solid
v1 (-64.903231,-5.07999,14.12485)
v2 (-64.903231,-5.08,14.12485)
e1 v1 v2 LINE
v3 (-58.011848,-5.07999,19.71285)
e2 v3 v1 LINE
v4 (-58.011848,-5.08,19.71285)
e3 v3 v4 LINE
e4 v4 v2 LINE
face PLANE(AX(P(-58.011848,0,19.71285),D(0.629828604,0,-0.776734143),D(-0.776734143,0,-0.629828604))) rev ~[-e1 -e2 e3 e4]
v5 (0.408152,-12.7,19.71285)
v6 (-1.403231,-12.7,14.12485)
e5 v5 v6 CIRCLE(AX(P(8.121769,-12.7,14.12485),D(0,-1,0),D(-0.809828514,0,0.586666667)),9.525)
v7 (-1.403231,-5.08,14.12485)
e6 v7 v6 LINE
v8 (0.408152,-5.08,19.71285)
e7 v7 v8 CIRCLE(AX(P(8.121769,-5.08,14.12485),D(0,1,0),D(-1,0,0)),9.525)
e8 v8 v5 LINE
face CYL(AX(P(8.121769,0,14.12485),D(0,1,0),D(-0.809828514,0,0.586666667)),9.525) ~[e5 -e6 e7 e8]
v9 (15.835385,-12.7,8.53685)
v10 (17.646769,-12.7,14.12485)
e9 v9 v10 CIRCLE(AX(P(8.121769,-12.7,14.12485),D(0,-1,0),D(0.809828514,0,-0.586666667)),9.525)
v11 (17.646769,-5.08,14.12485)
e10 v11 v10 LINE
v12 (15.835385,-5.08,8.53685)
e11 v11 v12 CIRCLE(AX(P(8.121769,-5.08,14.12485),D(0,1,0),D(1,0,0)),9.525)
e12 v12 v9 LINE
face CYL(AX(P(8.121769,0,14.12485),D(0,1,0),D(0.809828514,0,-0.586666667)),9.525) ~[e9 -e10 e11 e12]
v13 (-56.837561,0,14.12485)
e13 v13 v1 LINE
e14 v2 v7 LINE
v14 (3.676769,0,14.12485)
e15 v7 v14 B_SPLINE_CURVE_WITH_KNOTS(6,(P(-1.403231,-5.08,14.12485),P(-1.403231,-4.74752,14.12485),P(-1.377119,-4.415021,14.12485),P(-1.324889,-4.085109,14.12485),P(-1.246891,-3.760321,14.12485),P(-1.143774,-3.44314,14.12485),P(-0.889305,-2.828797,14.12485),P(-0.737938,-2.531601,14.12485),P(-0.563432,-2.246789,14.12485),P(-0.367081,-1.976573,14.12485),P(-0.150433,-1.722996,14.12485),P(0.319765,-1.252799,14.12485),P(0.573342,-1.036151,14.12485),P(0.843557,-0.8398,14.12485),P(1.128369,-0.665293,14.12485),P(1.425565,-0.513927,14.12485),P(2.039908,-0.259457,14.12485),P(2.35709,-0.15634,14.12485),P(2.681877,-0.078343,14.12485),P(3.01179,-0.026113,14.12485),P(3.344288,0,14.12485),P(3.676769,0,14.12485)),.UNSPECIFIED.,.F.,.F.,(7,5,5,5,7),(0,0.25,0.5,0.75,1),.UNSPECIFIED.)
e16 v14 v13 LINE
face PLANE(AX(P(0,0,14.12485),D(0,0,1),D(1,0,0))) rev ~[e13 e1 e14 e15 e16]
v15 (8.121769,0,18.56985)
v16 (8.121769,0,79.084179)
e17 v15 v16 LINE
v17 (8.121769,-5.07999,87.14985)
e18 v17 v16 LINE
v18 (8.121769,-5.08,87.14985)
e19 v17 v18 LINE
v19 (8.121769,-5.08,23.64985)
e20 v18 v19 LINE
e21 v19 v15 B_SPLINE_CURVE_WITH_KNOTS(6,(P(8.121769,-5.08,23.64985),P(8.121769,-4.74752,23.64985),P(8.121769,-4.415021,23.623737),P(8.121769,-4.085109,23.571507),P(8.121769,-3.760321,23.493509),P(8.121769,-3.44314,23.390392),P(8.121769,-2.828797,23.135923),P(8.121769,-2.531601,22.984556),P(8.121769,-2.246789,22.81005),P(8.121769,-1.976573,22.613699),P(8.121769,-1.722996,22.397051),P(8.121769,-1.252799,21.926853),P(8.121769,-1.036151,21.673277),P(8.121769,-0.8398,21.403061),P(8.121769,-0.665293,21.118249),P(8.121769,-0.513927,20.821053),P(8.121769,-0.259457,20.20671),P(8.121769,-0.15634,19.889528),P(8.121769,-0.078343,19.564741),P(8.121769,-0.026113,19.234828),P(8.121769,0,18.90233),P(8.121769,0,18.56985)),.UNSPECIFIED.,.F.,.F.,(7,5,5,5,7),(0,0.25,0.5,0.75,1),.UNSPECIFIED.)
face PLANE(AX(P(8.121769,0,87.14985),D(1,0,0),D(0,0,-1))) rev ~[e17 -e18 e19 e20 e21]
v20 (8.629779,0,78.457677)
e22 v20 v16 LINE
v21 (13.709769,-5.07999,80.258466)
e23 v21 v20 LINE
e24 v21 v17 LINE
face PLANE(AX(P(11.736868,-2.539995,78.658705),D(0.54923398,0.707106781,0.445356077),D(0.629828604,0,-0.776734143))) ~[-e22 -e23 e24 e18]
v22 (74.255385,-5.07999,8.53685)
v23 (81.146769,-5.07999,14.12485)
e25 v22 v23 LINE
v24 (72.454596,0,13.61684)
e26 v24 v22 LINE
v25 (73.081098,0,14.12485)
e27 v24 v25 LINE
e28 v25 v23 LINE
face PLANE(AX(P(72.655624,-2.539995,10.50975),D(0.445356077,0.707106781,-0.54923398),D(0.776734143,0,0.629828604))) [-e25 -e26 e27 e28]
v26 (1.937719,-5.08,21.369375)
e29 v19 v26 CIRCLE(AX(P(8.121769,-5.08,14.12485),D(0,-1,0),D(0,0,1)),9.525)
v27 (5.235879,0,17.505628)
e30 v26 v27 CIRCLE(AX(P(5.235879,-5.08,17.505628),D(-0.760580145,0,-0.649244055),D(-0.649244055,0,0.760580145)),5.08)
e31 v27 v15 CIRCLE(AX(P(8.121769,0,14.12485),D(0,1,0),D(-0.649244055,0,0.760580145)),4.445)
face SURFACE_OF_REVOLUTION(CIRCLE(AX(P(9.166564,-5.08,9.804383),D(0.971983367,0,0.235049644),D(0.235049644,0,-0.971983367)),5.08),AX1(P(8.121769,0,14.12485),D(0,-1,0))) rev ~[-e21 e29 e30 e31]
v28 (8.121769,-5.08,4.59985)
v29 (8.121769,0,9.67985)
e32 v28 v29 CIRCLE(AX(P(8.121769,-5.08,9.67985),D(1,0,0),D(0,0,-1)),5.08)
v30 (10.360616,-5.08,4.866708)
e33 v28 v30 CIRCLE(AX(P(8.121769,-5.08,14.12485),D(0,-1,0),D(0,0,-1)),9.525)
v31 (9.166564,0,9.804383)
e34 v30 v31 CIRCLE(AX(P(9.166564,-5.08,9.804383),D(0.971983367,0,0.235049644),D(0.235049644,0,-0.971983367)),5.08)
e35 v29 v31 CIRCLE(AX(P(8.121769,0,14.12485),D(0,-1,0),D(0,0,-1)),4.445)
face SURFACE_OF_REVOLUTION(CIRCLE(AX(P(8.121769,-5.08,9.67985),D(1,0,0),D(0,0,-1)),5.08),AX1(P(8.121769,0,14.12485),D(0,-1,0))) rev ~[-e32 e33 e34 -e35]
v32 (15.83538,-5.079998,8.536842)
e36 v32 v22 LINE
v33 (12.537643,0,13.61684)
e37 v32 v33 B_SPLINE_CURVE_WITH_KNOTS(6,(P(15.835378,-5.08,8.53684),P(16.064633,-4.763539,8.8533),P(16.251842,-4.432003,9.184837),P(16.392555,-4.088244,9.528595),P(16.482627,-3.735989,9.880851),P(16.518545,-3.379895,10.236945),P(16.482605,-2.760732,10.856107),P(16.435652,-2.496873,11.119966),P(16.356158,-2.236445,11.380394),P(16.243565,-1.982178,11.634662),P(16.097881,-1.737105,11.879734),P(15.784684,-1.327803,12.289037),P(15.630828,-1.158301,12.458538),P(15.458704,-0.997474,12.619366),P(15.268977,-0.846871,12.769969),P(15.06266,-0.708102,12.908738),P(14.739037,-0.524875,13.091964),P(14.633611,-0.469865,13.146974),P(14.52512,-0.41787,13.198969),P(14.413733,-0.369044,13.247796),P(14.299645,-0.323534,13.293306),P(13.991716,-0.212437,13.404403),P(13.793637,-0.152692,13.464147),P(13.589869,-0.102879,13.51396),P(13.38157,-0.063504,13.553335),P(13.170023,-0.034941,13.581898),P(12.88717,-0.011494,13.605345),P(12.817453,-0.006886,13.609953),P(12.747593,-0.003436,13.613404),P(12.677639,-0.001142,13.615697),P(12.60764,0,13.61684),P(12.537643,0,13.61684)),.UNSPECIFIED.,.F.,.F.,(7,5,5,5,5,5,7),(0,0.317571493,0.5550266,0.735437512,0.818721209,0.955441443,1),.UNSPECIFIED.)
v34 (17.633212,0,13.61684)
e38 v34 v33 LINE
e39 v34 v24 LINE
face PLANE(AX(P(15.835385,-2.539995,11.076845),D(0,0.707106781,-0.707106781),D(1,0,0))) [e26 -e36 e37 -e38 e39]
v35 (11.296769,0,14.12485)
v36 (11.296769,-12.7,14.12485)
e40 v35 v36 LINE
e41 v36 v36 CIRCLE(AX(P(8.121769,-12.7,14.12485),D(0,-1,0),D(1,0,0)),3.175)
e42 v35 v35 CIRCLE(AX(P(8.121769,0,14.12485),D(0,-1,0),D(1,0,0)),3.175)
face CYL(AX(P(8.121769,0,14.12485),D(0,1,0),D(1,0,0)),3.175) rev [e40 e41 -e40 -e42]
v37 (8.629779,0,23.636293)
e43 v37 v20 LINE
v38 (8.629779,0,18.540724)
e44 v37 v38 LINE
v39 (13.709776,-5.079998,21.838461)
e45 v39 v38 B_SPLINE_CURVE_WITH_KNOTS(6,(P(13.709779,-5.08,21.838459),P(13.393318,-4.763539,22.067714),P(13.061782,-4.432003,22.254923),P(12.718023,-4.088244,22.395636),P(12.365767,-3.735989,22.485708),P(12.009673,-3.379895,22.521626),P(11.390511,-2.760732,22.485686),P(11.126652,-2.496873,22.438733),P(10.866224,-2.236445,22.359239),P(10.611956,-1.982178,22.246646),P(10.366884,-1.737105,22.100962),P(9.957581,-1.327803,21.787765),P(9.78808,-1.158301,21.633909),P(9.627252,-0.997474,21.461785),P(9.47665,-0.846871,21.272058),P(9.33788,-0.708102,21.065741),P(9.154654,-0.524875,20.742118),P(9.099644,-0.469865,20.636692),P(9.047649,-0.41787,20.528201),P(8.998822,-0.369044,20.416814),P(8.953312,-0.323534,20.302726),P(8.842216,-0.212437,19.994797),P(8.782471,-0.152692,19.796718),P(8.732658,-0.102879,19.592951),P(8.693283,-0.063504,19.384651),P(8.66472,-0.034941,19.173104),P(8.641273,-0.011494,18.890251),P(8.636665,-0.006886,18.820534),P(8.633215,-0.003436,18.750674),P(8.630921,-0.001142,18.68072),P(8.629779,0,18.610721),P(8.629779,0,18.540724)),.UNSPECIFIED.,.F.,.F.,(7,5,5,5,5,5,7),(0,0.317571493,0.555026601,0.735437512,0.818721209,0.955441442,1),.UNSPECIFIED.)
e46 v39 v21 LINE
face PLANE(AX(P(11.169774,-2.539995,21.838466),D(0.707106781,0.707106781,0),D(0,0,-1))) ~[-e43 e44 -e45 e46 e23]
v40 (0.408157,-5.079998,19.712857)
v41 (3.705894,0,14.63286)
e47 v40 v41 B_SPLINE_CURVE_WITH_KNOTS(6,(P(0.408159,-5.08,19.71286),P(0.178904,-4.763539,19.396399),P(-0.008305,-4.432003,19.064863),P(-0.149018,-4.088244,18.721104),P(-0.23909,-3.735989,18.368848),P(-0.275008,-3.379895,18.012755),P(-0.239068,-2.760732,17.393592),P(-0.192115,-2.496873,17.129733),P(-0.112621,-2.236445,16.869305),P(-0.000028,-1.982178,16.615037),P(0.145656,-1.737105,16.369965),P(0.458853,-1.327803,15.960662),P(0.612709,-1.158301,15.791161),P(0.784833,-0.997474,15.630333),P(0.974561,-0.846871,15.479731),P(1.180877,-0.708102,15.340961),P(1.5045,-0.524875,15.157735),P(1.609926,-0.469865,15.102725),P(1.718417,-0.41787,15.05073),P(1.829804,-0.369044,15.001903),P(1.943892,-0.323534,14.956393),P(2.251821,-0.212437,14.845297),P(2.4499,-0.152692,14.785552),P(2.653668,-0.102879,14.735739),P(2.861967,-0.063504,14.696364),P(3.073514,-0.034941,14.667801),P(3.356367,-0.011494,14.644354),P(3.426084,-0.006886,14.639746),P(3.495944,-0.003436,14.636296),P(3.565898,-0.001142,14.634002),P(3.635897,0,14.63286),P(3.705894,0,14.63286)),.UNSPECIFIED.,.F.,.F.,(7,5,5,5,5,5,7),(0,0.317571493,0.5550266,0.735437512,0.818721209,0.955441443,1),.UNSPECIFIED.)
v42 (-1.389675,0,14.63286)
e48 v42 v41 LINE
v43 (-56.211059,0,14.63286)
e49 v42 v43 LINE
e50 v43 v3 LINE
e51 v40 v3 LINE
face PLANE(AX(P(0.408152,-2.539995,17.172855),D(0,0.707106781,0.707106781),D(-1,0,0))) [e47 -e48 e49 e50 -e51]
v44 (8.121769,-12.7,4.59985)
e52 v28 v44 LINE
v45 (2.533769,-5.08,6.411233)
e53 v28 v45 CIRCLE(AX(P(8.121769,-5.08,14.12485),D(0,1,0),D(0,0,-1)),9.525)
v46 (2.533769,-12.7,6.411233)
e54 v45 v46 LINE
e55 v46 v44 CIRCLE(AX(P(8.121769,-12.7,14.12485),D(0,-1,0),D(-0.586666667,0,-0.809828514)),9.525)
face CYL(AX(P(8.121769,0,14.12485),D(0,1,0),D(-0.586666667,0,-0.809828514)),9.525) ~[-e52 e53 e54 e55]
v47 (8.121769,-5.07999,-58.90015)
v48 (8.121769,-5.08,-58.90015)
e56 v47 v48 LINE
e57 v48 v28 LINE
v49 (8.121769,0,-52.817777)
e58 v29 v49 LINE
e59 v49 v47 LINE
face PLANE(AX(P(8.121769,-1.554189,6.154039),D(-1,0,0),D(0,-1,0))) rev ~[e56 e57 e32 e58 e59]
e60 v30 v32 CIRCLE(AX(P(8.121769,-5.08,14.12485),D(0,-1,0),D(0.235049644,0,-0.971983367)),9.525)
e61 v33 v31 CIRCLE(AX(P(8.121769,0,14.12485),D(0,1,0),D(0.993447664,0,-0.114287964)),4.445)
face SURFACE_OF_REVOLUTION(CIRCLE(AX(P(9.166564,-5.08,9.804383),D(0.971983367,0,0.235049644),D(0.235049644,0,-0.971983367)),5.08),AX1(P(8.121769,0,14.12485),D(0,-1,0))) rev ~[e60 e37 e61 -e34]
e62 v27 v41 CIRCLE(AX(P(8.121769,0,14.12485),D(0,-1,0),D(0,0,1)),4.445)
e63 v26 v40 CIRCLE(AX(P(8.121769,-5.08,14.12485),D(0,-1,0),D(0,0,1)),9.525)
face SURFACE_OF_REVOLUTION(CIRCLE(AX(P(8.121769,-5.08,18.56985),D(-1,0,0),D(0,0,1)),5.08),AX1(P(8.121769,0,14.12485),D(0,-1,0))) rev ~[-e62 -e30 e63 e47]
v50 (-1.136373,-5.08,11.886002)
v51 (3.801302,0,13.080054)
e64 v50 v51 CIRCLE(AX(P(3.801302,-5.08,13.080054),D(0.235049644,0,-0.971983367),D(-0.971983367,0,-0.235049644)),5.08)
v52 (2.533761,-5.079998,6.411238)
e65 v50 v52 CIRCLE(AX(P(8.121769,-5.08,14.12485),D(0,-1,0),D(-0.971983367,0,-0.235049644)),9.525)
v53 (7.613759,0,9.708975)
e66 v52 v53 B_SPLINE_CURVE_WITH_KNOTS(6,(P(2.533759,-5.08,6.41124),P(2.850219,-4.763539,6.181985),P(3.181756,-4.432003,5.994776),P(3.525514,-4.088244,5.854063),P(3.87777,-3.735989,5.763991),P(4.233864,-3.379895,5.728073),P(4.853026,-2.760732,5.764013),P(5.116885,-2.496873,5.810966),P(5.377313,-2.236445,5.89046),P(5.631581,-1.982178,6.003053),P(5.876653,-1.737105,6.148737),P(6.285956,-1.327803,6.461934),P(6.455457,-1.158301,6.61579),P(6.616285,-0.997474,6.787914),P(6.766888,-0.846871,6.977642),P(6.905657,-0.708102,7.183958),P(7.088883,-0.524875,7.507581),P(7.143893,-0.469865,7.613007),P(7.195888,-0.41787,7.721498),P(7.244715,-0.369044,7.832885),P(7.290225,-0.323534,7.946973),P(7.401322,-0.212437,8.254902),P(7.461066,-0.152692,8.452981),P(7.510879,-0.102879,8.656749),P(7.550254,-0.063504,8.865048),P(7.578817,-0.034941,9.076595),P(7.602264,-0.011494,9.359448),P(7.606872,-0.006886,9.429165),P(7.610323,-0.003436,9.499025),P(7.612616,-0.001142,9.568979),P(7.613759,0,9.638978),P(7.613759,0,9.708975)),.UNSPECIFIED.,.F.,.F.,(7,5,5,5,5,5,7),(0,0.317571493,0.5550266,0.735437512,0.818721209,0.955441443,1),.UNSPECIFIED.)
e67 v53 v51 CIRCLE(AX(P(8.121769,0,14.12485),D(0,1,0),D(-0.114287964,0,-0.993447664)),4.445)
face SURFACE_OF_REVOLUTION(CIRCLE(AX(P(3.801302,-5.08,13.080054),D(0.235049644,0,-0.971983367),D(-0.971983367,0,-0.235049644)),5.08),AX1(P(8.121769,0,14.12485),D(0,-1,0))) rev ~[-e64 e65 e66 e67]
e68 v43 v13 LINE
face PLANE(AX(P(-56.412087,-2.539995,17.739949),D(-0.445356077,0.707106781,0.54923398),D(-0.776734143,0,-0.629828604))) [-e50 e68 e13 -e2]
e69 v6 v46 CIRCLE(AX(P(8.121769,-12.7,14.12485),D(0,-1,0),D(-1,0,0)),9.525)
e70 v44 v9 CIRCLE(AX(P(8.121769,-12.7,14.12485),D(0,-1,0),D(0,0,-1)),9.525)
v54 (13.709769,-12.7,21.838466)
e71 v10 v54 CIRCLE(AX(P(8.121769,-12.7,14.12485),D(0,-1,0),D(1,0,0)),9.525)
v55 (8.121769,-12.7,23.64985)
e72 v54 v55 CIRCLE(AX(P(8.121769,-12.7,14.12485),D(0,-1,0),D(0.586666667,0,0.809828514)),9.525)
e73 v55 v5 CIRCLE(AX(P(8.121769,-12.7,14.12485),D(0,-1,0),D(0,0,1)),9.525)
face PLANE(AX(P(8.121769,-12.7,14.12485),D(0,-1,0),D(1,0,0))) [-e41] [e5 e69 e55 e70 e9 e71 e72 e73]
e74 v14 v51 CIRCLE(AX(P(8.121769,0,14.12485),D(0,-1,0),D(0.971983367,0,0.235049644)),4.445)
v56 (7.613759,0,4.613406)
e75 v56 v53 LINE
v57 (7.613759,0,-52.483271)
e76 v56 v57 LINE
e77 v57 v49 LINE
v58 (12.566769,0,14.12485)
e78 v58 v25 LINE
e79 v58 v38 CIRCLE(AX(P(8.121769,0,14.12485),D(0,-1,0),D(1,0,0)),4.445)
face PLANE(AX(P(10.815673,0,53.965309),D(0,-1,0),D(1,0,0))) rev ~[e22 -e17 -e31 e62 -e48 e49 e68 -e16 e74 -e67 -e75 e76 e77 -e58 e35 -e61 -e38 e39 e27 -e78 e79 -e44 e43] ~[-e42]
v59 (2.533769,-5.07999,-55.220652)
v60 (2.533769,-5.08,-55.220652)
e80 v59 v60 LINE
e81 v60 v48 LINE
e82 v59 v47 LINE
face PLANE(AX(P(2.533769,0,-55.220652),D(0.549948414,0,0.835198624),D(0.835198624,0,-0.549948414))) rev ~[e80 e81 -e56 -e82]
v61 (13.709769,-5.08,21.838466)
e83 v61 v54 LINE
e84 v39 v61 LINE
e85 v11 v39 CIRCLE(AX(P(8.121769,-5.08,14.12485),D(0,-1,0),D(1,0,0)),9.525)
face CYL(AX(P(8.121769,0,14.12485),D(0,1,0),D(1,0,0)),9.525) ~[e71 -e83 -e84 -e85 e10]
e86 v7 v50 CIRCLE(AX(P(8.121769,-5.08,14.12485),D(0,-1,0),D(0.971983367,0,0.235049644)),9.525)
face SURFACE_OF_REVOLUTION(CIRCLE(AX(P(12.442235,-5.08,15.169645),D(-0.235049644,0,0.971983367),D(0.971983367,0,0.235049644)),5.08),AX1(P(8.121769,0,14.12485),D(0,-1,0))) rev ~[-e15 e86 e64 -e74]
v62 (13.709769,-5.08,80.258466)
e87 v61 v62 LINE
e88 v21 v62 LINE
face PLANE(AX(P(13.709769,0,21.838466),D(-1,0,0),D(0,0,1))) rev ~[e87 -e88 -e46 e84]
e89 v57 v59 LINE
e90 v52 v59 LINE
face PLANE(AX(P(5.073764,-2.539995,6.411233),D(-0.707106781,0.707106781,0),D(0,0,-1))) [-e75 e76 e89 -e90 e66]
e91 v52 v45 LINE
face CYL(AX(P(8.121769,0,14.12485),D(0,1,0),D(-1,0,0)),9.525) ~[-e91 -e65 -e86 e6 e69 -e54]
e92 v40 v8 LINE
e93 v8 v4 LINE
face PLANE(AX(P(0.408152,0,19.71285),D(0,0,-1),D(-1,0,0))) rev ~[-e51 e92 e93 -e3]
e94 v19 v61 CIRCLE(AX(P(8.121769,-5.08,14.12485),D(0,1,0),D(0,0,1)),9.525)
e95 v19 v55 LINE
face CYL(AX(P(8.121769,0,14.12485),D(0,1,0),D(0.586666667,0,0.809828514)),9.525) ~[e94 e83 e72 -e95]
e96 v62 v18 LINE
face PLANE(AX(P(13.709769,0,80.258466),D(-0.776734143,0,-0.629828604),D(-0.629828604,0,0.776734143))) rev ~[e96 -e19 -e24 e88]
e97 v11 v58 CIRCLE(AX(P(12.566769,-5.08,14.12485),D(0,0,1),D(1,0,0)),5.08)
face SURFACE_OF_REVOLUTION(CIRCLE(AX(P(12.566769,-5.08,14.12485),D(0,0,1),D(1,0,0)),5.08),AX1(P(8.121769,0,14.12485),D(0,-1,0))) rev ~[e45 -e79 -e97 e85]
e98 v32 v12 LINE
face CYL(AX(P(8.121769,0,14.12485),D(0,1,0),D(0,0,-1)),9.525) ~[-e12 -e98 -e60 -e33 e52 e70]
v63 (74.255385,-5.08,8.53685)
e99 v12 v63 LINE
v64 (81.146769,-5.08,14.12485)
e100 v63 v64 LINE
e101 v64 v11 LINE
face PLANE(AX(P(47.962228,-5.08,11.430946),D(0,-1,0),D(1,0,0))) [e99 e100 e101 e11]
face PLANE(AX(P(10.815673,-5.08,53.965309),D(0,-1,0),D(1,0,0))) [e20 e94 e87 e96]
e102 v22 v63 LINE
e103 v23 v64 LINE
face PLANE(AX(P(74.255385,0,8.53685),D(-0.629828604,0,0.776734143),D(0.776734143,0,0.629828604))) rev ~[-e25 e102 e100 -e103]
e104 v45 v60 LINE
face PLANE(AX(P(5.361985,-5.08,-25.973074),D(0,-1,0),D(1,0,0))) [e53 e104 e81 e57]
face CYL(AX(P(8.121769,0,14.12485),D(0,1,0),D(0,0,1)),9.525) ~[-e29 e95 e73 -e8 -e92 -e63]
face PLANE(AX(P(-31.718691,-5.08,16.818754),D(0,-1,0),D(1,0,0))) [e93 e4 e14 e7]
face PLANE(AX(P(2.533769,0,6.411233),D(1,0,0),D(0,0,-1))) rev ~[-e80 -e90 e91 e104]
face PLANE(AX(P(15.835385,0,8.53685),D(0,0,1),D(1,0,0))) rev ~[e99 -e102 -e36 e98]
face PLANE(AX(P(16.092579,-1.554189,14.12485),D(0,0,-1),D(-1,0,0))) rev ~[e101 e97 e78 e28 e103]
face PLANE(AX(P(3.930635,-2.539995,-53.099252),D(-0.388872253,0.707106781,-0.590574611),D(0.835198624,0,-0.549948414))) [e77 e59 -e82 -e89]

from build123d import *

# Parameters (mm, degrees)
F0_R         = 3.175
F1_DEPTH     = 12.7
F2_DEPTH     = 5.08
F3_SIZE      = 5.07999
F4_T3_ANGLE  = 206.8900819295
F4_T7_ANGLE  = 130.484631046
F4_T11_ANGLE = 206.8900819295
F4_T15_ANGLE = 206.8900819295
F4_T19_ANGLE = 130.484631046
F4_T23_ANGLE = 206.8900819295
F4_T27_ANGLE = 206.8900819295
F4_T31_ANGLE = 130.484631046
F4_T35_ANGLE = 206.8900819295
F4_T39_ANGLE = 206.8900819295
F4_T43_ANGLE = 130.484631046
F4_T47_ANGLE = 206.8900819295


# Not quite as in the source:
# - a fillet or chamfer that OpenCascade refuses, or shapes differently, is made with other operations: its cross-section is extruded or revolved along the edge and cut away or added
# - a fillet or chamfer is up to 0.001 mm smaller than in the source, because OpenCascade refuses the exact size


with BuildPart() as f1:
    # F0 (on Front) → F1 (new body)
    with BuildSketch(Plane.XZ):
        with BuildLine():
            ThreePointArc((15.8353851332, 8.5368495443), (17.1826135049, 11.1877228091), (17.6467685365, 14.1248495443))
            ThreePointArc((17.6467685365, 14.1248495443), (16.6056156886, 18.4549722331), (13.7097685365, 21.838466141))
            ThreePointArc((13.7097685365, 21.838466141), (11.0588952717, 23.1856945127), (8.1217685365, 23.6498495443))
            ThreePointArc((8.1217685365, 23.6498495443), (3.7916458477, 22.6086966964), (0.4081519399, 19.7128495443))
            ThreePointArc((0.4081519399, 19.7128495443), (-0.9390764319, 17.0619762795), (-1.4032314635, 14.1248495443))
            ThreePointArc((-1.4032314635, 14.1248495443), (-0.3620786156, 9.7947268555), (2.5337685365, 6.4112329477))
            ThreePointArc((2.5337685365, 6.4112329477), (5.1846418013, 5.0640045759), (8.1217685365, 4.5998495443))
            ThreePointArc((8.1217685365, 4.5998495443), (12.4518912253, 5.6410023922), (15.8353851332, 8.5368495443))
        make_face()
        with Locations((8.1217685365, 14.1248495443)):
            Circle(F0_R, mode=Mode.SUBTRACT)
    extrude(amount=F1_DEPTH)

    # F0 (on Front) → F2 (join)
    with BuildSketch(Plane.XZ):
        with BuildLine():
            ThreePointArc((8.1217685365, 23.6498495443), (11.0588952717, 23.1856945127), (13.7097685365, 21.838466141))
            Line((13.7097685365, 21.838466141), (13.7097685365, 80.258466141))
            Line((13.7097685365, 80.258466141), (8.1217685365, 87.1498495443))
            Line((8.1217685365, 87.1498495443), (8.1217685365, 23.6498495443))
        make_face()
        with BuildLine():
            Line((81.1467685365, 14.1248495443), (17.6467685365, 14.1248495443))
            ThreePointArc((17.6467685365, 14.1248495443), (17.1826135049, 11.1877228091), (15.8353851332, 8.5368495443))
            Line((15.8353851332, 8.5368495443), (74.2553851332, 8.5368495443))
            Line((74.2553851332, 8.5368495443), (81.1467685365, 14.1248495443))
        make_face()
        with BuildLine():
            ThreePointArc((-1.4032314635, 14.1248495443), (-0.9390764319, 17.0619762795), (0.4081519399, 19.7128495443))
            Line((0.4081519399, 19.7128495443), (-58.0118480601, 19.7128495443))
            Line((-58.0118480601, 19.7128495443), (-64.9032314635, 14.1248495443))
            Line((-64.9032314635, 14.1248495443), (-1.4032314635, 14.1248495443))
        make_face()
        with BuildLine():
            Line((8.1217685365, -58.9001504557), (8.1217685365, 4.5998495443))
            ThreePointArc((8.1217685365, 4.5998495443), (5.1846418013, 5.0640045759), (2.5337685365, 6.4112329477))
            Line((2.5337685365, 6.4112329477), (2.5337685365, -55.2206523716))
            Line((2.5337685365, -55.2206523716), (8.1217685365, -58.9001504557))
        make_face()
    extrude(amount=F2_DEPTH)

    # F3 (size 5.08 in the source; OpenCascade refuses exactly that, so slightly less here)
    f3_edges = [f1.edges().sort_by_distance(p)[0] for p in [
        (77.701077, 0, 11.33085),
        (45.045385, 0, 8.53685),
        (13.709769, 0, 51.048466),
        (10.915769, 0, 83.704158),
        (2.533769, 0, -24.40471),
        (5.327769, 0, -57.060401),
        (-28.801848, 0, 19.71285),
        (-61.45754, 0, 16.91885),
    ]]
    chamfer(f3_edges, length=F3_SIZE)

    # F4: fillet of radius 5.08 on 4 edges, made by hand


with BuildPart() as f4_tool1:
    # F4_s2 → F4_t3 (revolve)
    with BuildSketch(Plane(origin=(10.9000788328, 0, 2.6359089402), x_dir=(0, 1, 0), z_dir=(-0.9719833666, 0, -0.2350496437))):
        with BuildLine():
            ThreePointArc((-5.08, -2.2951000126), (-1.4878975516, -3.7829975641), (0, -7.3751000126))
            Line((0, -7.3751000126), (0, -2.2951000126))
            Line((0, -2.2951000126), (-5.08, -2.2951000126))
        make_face()
    revolve(axis=Axis((8.1217685365, 0, 14.1248495443), (0, -1, 0)), revolution_arc=F4_T3_ANGLE)

    split(bisect_by=Plane(origin=(0, -6.8084197722, 6.8084197722), x_dir=(1, 0, 0), z_dir=(0, 0.7071067812, -0.7071067812)), keep=Keep.TOP)


with BuildPart() as f4_tool5:
    # F4_s6 → F4_t7 (revolve)
    with BuildSketch(Plane.XY.offset(14.1248495443)):
        with BuildLine():
            ThreePointArc((17.6467685365, -5.08), (16.158870985, -1.4878975516), (12.5667685365, 0))
            Line((12.5667685365, 0), (17.6467685365, 0))
            Line((17.6467685365, 0), (17.6467685365, -5.08))
        make_face()
    revolve(axis=Axis((8.1217685365, 0, 14.1248495443), (0, -1, 0)), revolution_arc=F4_T7_ANGLE)

    split(bisect_by=Plane(origin=(4.3148892683, 4.3148892683, 0), x_dir=(0, 0, 1), z_dir=(0.7071067812, 0.7071067812, 0)), keep=Keep.TOP)


with BuildPart() as f4_tool9:
    # F4_s10 → F4_t11 (revolve)
    with BuildSketch(Plane(origin=(10.9000788328, 0, 2.6359089402), x_dir=(0, 1, 0), z_dir=(-0.9719833666, 0, -0.2350496437))):
        with BuildLine():
            ThreePointArc((-5.08, -2.2951000126), (-1.4878975516, -3.7829975641), (0, -7.3751000126))
            Line((0, -7.3751000126), (0, -2.2951000126))
            Line((0, -2.2951000126), (-5.08, -2.2951000126))
        make_face()
    revolve(axis=Axis((8.1217685365, 0, 14.1248495443), (0, -1, 0)), revolution_arc=F4_T11_ANGLE)

    split(bisect_by=Plane.YZ.offset(8.1217685365), keep=Keep.BOTTOM)


with BuildPart() as f4_tool13:
    # F4_s14 → F4_t15 (revolve)
    with BuildSketch(Plane(origin=(-2.7783102963, 0, 11.4889406041), x_dir=(0, 1, 0), z_dir=(-0.2350496437, 0, 0.9719833666))):
        with BuildLine():
            ThreePointArc((-5.08, -1.6892647777), (-1.4878975516, -3.1771623292), (0, -6.7692647777))
            Line((0, -6.7692647777), (0, -1.6892647777))
            Line((0, -1.6892647777), (-5.08, -1.6892647777))
        make_face()
    revolve(axis=Axis((8.1217685365, 0, 14.1248495443), (0, -1, 0)), revolution_arc=F4_T15_ANGLE)

    split(bisect_by=Plane(origin=(3.8068792683, -3.8068792683, 0), x_dir=(0, 0, 1), z_dir=(-0.7071067812, 0.7071067812, 0)), keep=Keep.TOP)


with BuildPart() as f4_tool17:
    # F4_s18 → F4_t19 (revolve)
    with BuildSketch(Plane.YZ.offset(8.1217685365)):
        with BuildLine():
            ThreePointArc((-5.08, 4.5998495443), (-1.4878975516, 6.0877470959), (0, 9.6798495443))
            Line((0, 9.6798495443), (0, 4.5998495443))
            Line((0, 4.5998495443), (-5.08, 4.5998495443))
        make_face()
    revolve(axis=Axis((8.1217685365, 0, 14.1248495443), (0, -1, 0)), revolution_arc=F4_T19_ANGLE)

    split(bisect_by=Plane(origin=(0, -6.8084197722, 6.8084197722), x_dir=(1, 0, 0), z_dir=(0, 0.7071067812, -0.7071067812)), keep=Keep.TOP)


with BuildPart() as f4_tool21:
    # F4_s22 → F4_t23 (revolve)
    with BuildSketch(Plane(origin=(-2.7783102963, 0, 11.4889406041), x_dir=(0, 1, 0), z_dir=(-0.2350496437, 0, 0.9719833666))):
        with BuildLine():
            ThreePointArc((-5.08, -1.6892647777), (-1.4878975516, -3.1771623292), (0, -6.7692647777))
            Line((0, -6.7692647777), (0, -1.6892647777))
            Line((0, -1.6892647777), (-5.08, -1.6892647777))
        make_face()
    revolve(axis=Axis((8.1217685365, 0, 14.1248495443), (0, -1, 0)), revolution_arc=F4_T23_ANGLE)

    split(bisect_by=Plane.XY.offset(14.1248495443), keep=Keep.TOP)


with BuildPart() as f4_tool25:
    # F4_s26 → F4_t27 (revolve)
    with BuildSketch(Plane(origin=(-2.7783102963, 0, 11.4889406041), x_dir=(0, 1, 0), z_dir=(0.2350496437, 0, -0.9719833666))):
        with BuildLine():
            ThreePointArc((-5.08, 20.7392647777), (-1.4878975516, 19.2513672261), (0, 15.6592647777))
            Line((0, 15.6592647777), (0, 20.7392647777))
            Line((0, 20.7392647777), (-5.08, 20.7392647777))
        make_face()
    revolve(axis=Axis((8.1217685365, 0, 14.1248495443), (0, -1, 0)), revolution_arc=F4_T27_ANGLE)

    split(bisect_by=Plane(origin=(4.3148892683, 4.3148892683, 0), x_dir=(0, 0, 1), z_dir=(0.7071067812, 0.7071067812, 0)), keep=Keep.TOP)


with BuildPart() as f4_tool29:
    # F4_s30 → F4_t31 (revolve)
    with BuildSketch(Plane.YZ.offset(8.1217685365)):
        with BuildLine():
            ThreePointArc((-5.08, 23.6498495443), (-1.4878975516, 22.1619519927), (0, 18.5698495443))
            Line((0, 18.5698495443), (0, 23.6498495443))
            Line((0, 23.6498495443), (-5.08, 23.6498495443))
        make_face()
    revolve(axis=Axis((8.1217685365, 0, 14.1248495443), (0, -1, 0)), revolution_arc=F4_T31_ANGLE)

    split(bisect_by=Plane(origin=(0, 7.3164297722, 7.3164297722), x_dir=(1, 0, 0), z_dir=(0, 0.7071067812, 0.7071067812)), keep=Keep.TOP)


with BuildPart() as f4_tool33:
    # F4_s34 → F4_t35 (revolve)
    with BuildSketch(Plane(origin=(-2.7783102963, 0, 11.4889406041), x_dir=(0, 1, 0), z_dir=(0.2350496437, 0, -0.9719833666))):
        with BuildLine():
            ThreePointArc((-5.08, 20.7392647777), (-1.4878975516, 19.2513672261), (0, 15.6592647777))
            Line((0, 15.6592647777), (0, 20.7392647777))
            Line((0, 20.7392647777), (-5.08, 20.7392647777))
        make_face()
    revolve(axis=Axis((8.1217685365, 0, 14.1248495443), (0, -1, 0)), revolution_arc=F4_T35_ANGLE)

    split(bisect_by=Plane.XY.offset(14.1248495443), keep=Keep.BOTTOM)


with BuildPart() as f4_tool37:
    # F4_s38 → F4_t39 (revolve)
    with BuildSketch(Plane(origin=(10.9000788328, 0, 2.6359089402), x_dir=(0, 1, 0), z_dir=(0.9719833666, 0, 0.2350496437))):
        with BuildLine():
            ThreePointArc((-5.08, 21.3451000126), (-1.4878975516, 19.857202461), (0, 16.2651000126))
            Line((0, 16.2651000126), (0, 21.3451000126))
            Line((0, 21.3451000126), (-5.08, 21.3451000126))
        make_face()
    revolve(axis=Axis((8.1217685365, 0, 14.1248495443), (0, -1, 0)), revolution_arc=F4_T39_ANGLE)

    split(bisect_by=Plane(origin=(0, 7.3164297722, 7.3164297722), x_dir=(1, 0, 0), z_dir=(0, 0.7071067812, 0.7071067812)), keep=Keep.TOP)


with BuildPart() as f4_tool41:
    # F4_s42 → F4_t43 (revolve)
    with BuildSketch(Plane.XY.offset(14.1248495443)):
        with BuildLine():
            ThreePointArc((-1.4032314635, -5.08), (0.0846660881, -1.4878975516), (3.6767685365, 0))
            Line((3.6767685365, 0), (-1.4032314635, 0))
            Line((-1.4032314635, 0), (-1.4032314635, -5.08))
        make_face()
    revolve(axis=Axis((8.1217685365, 0, 14.1248495443), (0, -1, 0)), revolution_arc=F4_T43_ANGLE)

    split(bisect_by=Plane(origin=(3.8068792683, -3.8068792683, 0), x_dir=(0, 0, 1), z_dir=(-0.7071067812, 0.7071067812, 0)), keep=Keep.TOP)


with BuildPart() as f4_tool45:
    # F4_s46 → F4_t47 (revolve)
    with BuildSketch(Plane(origin=(10.9000788328, 0, 2.6359089402), x_dir=(0, 1, 0), z_dir=(0.9719833666, 0, 0.2350496437))):
        with BuildLine():
            ThreePointArc((-5.08, 21.3451000126), (-1.4878975516, 19.857202461), (0, 16.2651000126))
            Line((0, 16.2651000126), (0, 21.3451000126))
            Line((0, 21.3451000126), (-5.08, 21.3451000126))
        make_face()
    revolve(axis=Axis((8.1217685365, 0, 14.1248495443), (0, -1, 0)), revolution_arc=F4_T47_ANGLE)

    split(bisect_by=Plane.YZ.offset(8.1217685365), keep=Keep.TOP)


with BuildPart() as f1_1:
    add(f1.part)

    # F4_t49: cut F4_tool1, F4_tool5, F4_tool9, F4_tool13, F4_tool17, F4_tool21, F4_tool25, F4_tool29, F4_tool33, F4_tool37, F4_tool41, F4_tool45
    add([f4_tool1.part, f4_tool5.part, f4_tool9.part, f4_tool13.part, f4_tool17.part, f4_tool21.part, f4_tool25.part, f4_tool29.part, f4_tool33.part, f4_tool37.part, f4_tool41.part, f4_tool45.part], mode=Mode.SUBTRACT)


solid = f1_1.part
